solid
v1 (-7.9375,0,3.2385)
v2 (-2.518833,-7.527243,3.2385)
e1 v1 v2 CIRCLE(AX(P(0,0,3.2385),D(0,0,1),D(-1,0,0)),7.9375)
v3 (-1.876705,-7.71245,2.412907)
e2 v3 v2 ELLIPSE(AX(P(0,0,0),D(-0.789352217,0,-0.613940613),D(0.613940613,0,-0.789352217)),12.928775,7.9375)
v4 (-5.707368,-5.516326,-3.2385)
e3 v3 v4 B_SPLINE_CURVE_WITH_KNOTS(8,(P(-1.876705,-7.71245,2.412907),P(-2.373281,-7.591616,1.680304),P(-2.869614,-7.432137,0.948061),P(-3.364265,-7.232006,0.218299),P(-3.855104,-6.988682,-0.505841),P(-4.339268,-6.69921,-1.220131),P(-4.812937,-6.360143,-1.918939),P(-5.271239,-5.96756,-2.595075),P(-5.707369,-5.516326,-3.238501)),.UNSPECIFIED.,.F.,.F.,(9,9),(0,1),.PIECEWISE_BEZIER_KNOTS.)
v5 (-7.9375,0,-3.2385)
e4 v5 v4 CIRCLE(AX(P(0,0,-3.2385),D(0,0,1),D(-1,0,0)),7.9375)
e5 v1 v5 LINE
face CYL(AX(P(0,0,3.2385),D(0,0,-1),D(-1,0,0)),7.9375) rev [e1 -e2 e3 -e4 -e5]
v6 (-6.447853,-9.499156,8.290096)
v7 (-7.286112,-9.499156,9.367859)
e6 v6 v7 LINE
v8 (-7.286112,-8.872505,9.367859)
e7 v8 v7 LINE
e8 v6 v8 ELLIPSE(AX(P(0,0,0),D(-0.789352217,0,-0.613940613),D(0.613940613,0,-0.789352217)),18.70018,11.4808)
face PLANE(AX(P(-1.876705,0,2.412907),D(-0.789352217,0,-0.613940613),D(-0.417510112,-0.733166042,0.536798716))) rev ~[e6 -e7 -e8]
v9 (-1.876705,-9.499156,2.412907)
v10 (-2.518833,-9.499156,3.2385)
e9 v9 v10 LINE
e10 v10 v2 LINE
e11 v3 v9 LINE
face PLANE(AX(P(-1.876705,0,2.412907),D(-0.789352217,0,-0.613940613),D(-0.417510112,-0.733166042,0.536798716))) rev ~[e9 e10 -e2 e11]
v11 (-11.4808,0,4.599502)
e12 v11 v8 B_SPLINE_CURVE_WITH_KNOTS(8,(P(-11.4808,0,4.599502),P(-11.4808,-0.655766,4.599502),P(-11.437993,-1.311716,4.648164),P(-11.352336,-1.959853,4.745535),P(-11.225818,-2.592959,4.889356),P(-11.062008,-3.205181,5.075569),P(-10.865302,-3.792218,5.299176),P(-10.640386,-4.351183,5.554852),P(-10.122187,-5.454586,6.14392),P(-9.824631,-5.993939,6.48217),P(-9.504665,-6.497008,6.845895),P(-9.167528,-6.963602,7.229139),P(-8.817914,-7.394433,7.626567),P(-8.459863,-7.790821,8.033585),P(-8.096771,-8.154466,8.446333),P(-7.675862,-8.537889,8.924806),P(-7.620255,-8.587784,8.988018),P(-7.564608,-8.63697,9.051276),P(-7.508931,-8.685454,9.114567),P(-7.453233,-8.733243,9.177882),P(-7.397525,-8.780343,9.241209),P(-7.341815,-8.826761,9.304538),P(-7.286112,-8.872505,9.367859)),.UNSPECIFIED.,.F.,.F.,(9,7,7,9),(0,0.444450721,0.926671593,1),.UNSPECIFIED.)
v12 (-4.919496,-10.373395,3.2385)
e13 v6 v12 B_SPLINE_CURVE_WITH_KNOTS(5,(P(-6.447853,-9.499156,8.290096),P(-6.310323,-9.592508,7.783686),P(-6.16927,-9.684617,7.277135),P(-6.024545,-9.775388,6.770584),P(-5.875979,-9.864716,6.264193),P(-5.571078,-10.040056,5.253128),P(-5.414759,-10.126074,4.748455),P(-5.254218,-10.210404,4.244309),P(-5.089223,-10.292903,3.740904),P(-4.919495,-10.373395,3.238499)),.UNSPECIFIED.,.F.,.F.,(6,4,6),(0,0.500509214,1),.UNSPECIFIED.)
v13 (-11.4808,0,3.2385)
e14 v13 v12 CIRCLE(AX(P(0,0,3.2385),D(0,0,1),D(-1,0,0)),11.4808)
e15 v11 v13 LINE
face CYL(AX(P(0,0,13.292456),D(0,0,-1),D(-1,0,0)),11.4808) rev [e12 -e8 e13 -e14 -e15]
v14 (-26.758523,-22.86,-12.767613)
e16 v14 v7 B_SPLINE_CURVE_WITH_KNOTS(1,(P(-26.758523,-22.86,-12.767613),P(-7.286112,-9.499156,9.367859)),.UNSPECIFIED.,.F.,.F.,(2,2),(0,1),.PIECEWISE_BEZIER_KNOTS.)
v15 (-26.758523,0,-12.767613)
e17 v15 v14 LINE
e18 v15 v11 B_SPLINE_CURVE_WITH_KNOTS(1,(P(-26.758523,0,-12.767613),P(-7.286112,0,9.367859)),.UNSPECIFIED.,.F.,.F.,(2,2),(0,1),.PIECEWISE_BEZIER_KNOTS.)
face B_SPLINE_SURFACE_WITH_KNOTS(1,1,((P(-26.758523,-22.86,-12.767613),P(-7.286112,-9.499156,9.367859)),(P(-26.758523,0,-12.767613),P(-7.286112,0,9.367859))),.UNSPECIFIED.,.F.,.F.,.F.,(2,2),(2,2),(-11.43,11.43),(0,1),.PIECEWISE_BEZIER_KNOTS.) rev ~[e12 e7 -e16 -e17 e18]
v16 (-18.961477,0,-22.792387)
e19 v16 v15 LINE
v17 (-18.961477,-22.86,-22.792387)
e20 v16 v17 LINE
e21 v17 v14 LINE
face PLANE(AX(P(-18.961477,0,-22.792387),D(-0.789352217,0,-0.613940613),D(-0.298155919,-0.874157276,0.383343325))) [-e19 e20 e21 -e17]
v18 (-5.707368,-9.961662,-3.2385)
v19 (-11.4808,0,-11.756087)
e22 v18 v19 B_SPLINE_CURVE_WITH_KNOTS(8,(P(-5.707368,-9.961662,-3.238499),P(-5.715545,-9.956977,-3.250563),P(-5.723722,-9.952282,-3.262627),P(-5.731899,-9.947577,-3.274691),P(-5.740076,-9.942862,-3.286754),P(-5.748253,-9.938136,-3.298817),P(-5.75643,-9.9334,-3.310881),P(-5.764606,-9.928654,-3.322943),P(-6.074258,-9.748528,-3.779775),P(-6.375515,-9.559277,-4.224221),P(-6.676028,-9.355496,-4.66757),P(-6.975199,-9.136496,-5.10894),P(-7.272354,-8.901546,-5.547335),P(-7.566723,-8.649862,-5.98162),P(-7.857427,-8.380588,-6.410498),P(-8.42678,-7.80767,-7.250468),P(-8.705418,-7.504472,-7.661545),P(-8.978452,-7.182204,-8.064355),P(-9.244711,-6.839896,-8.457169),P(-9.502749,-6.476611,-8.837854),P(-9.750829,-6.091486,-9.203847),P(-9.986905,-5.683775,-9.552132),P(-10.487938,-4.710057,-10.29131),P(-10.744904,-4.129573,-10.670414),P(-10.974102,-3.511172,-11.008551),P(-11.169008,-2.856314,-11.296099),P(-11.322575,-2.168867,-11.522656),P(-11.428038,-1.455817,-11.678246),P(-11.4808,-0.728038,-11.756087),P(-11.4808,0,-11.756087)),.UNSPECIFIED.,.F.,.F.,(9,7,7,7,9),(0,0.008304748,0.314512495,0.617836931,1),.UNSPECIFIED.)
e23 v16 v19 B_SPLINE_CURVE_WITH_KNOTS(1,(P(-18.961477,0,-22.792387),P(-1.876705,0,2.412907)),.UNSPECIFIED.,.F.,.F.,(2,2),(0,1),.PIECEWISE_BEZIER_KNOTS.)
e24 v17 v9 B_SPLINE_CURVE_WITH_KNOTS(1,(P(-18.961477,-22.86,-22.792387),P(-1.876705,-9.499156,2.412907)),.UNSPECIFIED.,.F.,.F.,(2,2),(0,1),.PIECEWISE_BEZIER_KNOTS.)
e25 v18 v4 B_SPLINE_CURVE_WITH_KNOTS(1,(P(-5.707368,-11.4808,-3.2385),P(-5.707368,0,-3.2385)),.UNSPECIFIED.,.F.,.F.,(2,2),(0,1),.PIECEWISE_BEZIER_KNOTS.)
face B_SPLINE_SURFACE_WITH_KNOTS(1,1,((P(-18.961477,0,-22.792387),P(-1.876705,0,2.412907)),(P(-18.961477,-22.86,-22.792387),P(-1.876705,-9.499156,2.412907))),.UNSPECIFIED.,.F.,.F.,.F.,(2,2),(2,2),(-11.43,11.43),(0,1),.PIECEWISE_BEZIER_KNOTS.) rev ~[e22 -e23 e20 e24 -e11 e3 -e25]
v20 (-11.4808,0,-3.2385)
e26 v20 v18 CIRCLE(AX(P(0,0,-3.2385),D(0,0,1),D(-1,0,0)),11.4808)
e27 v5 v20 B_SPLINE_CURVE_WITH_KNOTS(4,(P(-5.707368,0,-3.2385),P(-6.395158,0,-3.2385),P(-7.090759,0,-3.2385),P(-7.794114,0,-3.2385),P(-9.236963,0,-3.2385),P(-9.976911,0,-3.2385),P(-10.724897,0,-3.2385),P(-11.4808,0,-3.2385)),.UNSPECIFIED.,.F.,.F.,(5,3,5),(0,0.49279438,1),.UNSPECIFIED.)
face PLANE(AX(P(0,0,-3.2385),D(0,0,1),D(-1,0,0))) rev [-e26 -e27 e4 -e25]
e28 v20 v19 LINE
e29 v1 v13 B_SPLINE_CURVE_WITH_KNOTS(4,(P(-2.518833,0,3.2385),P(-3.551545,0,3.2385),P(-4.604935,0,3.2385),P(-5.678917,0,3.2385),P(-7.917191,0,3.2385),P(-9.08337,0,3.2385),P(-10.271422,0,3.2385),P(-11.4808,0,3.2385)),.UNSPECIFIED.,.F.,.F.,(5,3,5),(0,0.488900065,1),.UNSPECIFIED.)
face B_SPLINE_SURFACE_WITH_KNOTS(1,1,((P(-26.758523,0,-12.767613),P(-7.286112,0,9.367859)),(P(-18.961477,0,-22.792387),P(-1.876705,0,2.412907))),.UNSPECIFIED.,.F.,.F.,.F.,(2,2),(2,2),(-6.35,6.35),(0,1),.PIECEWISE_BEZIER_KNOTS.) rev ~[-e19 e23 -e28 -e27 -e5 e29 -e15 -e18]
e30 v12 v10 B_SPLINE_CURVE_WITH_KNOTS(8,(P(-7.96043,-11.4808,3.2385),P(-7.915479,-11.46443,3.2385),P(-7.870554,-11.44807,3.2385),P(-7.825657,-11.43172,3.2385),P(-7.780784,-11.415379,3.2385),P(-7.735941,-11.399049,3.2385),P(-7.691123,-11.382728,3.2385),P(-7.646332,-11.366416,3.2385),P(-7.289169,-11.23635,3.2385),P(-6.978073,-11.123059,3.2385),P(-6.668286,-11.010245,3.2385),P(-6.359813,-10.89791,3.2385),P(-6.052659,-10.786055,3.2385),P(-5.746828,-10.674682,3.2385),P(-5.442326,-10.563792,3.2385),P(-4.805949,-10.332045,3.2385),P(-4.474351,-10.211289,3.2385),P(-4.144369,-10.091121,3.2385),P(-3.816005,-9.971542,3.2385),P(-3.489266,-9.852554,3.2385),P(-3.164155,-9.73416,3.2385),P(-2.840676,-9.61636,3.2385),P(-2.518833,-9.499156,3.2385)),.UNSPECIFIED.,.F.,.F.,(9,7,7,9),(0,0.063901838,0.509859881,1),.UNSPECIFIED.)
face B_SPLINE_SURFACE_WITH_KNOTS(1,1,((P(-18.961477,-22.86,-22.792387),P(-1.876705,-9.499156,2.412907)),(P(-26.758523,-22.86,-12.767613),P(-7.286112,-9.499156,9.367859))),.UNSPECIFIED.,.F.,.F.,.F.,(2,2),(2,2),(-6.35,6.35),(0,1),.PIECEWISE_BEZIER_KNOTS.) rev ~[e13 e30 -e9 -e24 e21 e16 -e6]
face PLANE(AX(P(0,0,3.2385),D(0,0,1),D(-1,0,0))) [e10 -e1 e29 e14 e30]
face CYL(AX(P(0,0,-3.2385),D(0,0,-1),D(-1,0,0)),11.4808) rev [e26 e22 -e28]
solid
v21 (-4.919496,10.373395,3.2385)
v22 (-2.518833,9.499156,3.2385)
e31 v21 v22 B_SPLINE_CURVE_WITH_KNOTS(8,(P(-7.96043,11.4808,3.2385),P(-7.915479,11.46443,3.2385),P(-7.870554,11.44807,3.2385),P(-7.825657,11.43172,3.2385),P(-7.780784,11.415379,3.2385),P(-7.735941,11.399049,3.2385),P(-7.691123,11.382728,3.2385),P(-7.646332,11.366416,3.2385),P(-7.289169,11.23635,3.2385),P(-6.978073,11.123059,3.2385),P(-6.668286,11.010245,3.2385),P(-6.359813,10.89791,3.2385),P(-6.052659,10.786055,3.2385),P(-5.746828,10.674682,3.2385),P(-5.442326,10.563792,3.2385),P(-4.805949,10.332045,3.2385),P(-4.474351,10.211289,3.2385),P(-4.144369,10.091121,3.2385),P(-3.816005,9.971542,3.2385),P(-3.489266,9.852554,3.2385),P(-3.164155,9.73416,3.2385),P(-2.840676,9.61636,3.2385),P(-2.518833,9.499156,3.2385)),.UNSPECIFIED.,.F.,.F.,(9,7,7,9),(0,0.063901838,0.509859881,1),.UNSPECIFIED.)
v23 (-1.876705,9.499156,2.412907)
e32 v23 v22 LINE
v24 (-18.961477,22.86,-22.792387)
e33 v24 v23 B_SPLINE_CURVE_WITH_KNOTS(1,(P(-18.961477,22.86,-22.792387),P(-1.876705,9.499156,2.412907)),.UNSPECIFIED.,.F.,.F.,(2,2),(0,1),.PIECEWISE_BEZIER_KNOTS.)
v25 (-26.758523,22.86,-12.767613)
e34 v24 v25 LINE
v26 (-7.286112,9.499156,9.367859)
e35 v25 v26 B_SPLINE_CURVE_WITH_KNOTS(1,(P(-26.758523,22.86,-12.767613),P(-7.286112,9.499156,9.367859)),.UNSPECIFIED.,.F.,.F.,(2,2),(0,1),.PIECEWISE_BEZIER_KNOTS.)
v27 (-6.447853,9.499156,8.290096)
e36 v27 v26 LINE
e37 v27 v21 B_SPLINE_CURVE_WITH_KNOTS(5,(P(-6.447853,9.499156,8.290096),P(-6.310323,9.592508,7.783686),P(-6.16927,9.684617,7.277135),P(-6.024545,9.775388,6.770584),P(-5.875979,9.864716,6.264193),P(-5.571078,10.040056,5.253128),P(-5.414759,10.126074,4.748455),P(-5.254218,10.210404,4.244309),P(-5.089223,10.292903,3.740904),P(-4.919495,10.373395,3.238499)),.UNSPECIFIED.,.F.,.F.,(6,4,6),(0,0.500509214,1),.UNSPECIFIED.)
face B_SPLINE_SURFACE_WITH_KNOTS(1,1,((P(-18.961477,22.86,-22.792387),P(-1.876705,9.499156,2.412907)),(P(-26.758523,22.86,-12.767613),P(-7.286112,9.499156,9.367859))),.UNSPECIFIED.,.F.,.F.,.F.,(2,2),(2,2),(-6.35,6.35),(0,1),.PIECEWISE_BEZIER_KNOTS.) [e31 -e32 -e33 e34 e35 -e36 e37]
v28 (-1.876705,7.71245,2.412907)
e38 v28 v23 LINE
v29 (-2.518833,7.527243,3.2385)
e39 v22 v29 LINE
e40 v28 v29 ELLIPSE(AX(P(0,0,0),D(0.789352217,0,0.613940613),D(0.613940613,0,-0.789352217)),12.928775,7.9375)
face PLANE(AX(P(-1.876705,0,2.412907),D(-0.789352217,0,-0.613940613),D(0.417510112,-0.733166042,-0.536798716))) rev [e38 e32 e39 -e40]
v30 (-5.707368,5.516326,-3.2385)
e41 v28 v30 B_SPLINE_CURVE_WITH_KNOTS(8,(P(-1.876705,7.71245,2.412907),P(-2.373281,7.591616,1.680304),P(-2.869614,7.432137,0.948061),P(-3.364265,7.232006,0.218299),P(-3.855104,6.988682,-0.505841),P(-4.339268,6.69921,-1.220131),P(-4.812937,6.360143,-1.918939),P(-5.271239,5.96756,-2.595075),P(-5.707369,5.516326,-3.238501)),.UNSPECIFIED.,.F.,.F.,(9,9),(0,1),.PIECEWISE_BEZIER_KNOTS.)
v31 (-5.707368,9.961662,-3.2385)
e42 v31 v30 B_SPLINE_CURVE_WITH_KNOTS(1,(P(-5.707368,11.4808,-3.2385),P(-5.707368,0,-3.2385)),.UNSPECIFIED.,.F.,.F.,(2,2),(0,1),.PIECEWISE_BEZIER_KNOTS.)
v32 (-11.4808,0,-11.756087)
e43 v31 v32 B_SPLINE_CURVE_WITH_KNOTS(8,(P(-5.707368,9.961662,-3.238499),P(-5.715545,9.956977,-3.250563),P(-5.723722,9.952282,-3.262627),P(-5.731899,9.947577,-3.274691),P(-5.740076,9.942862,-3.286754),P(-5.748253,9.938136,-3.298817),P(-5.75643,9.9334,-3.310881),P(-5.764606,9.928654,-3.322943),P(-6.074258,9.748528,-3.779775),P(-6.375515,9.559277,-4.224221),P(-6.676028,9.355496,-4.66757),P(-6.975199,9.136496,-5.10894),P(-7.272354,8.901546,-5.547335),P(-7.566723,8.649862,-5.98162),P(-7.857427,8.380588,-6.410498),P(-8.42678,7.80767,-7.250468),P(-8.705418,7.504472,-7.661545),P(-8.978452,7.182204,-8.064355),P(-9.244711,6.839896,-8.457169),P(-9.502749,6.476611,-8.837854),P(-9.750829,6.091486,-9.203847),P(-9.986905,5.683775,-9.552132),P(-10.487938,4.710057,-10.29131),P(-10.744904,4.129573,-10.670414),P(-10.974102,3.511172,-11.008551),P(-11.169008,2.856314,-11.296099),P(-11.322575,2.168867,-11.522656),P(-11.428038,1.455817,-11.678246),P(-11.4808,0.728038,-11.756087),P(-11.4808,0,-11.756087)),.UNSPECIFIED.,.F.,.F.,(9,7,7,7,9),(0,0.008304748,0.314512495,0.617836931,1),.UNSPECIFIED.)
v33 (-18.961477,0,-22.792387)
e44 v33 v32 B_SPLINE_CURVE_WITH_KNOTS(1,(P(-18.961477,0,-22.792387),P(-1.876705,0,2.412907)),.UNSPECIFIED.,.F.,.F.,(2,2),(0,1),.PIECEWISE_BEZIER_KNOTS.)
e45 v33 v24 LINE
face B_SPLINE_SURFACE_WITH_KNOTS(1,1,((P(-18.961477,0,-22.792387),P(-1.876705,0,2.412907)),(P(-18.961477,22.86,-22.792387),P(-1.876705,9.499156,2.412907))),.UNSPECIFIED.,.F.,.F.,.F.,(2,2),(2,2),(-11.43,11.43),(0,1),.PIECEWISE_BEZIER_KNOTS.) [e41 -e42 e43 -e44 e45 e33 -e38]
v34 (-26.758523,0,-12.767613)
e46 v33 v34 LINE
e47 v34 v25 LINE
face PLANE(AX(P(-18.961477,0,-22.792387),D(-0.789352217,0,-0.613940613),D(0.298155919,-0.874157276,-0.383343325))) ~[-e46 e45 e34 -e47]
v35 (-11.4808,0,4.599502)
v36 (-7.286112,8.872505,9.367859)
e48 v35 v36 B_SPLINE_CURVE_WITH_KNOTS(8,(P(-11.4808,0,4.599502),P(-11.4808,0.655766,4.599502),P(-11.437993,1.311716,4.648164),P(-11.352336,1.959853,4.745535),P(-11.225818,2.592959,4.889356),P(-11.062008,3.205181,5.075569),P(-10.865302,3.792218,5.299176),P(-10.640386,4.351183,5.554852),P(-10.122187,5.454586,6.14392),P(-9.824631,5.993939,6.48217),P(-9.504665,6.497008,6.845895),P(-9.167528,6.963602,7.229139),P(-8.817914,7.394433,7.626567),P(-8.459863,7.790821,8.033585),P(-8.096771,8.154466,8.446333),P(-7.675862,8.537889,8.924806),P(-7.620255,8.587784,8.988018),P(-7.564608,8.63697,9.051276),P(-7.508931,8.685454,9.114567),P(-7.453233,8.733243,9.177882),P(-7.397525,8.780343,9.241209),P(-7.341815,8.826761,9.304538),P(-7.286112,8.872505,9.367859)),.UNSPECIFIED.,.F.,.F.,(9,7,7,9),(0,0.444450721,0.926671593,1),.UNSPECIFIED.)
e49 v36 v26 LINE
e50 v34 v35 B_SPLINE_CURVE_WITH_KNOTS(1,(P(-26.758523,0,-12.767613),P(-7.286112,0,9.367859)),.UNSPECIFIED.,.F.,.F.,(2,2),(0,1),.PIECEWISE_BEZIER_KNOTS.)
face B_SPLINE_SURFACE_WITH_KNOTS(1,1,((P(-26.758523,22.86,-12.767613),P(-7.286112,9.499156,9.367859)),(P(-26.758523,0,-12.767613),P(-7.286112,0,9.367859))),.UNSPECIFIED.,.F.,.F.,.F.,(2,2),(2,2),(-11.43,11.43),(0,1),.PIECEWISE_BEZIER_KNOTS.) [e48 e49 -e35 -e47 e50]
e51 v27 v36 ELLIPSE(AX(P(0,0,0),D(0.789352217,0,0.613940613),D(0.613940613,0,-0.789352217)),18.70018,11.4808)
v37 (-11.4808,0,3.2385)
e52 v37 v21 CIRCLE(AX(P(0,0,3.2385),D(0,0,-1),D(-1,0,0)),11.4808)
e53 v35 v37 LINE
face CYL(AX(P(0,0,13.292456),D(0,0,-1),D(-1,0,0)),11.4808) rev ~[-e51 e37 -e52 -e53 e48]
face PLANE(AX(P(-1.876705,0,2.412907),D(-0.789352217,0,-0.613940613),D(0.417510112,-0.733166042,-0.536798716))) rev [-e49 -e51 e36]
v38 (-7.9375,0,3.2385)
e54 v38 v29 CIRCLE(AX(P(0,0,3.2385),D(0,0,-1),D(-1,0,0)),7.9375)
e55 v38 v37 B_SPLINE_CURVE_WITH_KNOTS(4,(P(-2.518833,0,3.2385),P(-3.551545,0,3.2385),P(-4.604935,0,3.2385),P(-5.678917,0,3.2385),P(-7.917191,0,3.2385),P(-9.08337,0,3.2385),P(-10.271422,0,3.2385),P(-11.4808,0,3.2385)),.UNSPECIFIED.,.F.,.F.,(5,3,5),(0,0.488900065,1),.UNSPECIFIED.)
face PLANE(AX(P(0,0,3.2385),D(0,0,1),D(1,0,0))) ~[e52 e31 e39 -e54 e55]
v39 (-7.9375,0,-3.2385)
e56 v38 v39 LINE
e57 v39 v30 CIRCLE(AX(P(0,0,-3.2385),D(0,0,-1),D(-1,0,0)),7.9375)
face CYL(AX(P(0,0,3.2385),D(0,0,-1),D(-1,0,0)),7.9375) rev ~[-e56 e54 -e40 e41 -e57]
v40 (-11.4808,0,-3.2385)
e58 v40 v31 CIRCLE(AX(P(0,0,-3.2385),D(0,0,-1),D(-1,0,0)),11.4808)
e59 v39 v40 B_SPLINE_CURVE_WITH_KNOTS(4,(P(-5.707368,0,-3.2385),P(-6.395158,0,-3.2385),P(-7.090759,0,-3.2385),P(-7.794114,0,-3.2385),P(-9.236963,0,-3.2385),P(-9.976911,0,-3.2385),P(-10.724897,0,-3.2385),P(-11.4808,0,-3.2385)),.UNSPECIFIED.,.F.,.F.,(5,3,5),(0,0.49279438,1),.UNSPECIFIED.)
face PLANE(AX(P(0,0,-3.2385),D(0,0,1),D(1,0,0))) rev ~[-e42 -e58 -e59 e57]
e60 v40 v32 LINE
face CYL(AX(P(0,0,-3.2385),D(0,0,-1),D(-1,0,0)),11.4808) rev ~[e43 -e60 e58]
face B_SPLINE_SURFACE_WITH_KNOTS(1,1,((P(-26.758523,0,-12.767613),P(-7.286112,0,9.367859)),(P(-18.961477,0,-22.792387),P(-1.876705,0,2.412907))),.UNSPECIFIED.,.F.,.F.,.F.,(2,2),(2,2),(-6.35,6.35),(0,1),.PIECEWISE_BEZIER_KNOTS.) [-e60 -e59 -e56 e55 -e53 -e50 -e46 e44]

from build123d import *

# Parameters (mm, degrees)
F7_W = 22.86
F7_H = 12.7
F9_W = 9.4991559163
F9_H = 8.810961619


# Not quite as in the source:
# - a feature names something its author has since deleted; it is built from what else it names
# - the program builds the solid bodies; features that only make, move or delete a surface that nothing else refers to are left out


with BuildPart() as f10:
    # F7 (on line) → F10 section 0
    with BuildSketch(Plane(origin=(-22.86, 0, -17.78), x_dir=(0, -1, 0), z_dir=(-0.7893522174, 0, -0.6139406135))):
        with Locations((11.43, 0)):
            Rectangle(F7_W, F7_H)
    # F9 (on line) → F10 section 1
    with BuildSketch(Plane(origin=(0, 0, 0), x_dir=(0, -1, 0), z_dir=(-0.7893522174, 0, -0.6139406135))):
        with Locations((4.7495779581, 7.4622994289)):
            Rectangle(F9_W, F9_H)
    loft()

    # F11 (on Front) → F12 (revolve, cut)
    with BuildSketch(Plane.XZ):
        Polygon((-11.4808, 13.2924560457), (-11.4808, 4.7625), (-11.4808, 3.2385), (-7.9375, 3.2385), (-7.9375, -3.2385), (-11.4808, -3.2385), (-11.4808, -4.7625), (-11.4808, -25.4), (0, -25.4), (0, 0), (0, 13.2924560457), align=None)
    revolve(axis=Axis((0, 0, -12.7), (0, 0, 1)), mode=Mode.SUBTRACT)


with BuildPart() as f13_1:
    # F13: instance of F10
    add(f10.part.mirror(Plane.XZ))


solid = Compound([f10.part, f13_1.part])
